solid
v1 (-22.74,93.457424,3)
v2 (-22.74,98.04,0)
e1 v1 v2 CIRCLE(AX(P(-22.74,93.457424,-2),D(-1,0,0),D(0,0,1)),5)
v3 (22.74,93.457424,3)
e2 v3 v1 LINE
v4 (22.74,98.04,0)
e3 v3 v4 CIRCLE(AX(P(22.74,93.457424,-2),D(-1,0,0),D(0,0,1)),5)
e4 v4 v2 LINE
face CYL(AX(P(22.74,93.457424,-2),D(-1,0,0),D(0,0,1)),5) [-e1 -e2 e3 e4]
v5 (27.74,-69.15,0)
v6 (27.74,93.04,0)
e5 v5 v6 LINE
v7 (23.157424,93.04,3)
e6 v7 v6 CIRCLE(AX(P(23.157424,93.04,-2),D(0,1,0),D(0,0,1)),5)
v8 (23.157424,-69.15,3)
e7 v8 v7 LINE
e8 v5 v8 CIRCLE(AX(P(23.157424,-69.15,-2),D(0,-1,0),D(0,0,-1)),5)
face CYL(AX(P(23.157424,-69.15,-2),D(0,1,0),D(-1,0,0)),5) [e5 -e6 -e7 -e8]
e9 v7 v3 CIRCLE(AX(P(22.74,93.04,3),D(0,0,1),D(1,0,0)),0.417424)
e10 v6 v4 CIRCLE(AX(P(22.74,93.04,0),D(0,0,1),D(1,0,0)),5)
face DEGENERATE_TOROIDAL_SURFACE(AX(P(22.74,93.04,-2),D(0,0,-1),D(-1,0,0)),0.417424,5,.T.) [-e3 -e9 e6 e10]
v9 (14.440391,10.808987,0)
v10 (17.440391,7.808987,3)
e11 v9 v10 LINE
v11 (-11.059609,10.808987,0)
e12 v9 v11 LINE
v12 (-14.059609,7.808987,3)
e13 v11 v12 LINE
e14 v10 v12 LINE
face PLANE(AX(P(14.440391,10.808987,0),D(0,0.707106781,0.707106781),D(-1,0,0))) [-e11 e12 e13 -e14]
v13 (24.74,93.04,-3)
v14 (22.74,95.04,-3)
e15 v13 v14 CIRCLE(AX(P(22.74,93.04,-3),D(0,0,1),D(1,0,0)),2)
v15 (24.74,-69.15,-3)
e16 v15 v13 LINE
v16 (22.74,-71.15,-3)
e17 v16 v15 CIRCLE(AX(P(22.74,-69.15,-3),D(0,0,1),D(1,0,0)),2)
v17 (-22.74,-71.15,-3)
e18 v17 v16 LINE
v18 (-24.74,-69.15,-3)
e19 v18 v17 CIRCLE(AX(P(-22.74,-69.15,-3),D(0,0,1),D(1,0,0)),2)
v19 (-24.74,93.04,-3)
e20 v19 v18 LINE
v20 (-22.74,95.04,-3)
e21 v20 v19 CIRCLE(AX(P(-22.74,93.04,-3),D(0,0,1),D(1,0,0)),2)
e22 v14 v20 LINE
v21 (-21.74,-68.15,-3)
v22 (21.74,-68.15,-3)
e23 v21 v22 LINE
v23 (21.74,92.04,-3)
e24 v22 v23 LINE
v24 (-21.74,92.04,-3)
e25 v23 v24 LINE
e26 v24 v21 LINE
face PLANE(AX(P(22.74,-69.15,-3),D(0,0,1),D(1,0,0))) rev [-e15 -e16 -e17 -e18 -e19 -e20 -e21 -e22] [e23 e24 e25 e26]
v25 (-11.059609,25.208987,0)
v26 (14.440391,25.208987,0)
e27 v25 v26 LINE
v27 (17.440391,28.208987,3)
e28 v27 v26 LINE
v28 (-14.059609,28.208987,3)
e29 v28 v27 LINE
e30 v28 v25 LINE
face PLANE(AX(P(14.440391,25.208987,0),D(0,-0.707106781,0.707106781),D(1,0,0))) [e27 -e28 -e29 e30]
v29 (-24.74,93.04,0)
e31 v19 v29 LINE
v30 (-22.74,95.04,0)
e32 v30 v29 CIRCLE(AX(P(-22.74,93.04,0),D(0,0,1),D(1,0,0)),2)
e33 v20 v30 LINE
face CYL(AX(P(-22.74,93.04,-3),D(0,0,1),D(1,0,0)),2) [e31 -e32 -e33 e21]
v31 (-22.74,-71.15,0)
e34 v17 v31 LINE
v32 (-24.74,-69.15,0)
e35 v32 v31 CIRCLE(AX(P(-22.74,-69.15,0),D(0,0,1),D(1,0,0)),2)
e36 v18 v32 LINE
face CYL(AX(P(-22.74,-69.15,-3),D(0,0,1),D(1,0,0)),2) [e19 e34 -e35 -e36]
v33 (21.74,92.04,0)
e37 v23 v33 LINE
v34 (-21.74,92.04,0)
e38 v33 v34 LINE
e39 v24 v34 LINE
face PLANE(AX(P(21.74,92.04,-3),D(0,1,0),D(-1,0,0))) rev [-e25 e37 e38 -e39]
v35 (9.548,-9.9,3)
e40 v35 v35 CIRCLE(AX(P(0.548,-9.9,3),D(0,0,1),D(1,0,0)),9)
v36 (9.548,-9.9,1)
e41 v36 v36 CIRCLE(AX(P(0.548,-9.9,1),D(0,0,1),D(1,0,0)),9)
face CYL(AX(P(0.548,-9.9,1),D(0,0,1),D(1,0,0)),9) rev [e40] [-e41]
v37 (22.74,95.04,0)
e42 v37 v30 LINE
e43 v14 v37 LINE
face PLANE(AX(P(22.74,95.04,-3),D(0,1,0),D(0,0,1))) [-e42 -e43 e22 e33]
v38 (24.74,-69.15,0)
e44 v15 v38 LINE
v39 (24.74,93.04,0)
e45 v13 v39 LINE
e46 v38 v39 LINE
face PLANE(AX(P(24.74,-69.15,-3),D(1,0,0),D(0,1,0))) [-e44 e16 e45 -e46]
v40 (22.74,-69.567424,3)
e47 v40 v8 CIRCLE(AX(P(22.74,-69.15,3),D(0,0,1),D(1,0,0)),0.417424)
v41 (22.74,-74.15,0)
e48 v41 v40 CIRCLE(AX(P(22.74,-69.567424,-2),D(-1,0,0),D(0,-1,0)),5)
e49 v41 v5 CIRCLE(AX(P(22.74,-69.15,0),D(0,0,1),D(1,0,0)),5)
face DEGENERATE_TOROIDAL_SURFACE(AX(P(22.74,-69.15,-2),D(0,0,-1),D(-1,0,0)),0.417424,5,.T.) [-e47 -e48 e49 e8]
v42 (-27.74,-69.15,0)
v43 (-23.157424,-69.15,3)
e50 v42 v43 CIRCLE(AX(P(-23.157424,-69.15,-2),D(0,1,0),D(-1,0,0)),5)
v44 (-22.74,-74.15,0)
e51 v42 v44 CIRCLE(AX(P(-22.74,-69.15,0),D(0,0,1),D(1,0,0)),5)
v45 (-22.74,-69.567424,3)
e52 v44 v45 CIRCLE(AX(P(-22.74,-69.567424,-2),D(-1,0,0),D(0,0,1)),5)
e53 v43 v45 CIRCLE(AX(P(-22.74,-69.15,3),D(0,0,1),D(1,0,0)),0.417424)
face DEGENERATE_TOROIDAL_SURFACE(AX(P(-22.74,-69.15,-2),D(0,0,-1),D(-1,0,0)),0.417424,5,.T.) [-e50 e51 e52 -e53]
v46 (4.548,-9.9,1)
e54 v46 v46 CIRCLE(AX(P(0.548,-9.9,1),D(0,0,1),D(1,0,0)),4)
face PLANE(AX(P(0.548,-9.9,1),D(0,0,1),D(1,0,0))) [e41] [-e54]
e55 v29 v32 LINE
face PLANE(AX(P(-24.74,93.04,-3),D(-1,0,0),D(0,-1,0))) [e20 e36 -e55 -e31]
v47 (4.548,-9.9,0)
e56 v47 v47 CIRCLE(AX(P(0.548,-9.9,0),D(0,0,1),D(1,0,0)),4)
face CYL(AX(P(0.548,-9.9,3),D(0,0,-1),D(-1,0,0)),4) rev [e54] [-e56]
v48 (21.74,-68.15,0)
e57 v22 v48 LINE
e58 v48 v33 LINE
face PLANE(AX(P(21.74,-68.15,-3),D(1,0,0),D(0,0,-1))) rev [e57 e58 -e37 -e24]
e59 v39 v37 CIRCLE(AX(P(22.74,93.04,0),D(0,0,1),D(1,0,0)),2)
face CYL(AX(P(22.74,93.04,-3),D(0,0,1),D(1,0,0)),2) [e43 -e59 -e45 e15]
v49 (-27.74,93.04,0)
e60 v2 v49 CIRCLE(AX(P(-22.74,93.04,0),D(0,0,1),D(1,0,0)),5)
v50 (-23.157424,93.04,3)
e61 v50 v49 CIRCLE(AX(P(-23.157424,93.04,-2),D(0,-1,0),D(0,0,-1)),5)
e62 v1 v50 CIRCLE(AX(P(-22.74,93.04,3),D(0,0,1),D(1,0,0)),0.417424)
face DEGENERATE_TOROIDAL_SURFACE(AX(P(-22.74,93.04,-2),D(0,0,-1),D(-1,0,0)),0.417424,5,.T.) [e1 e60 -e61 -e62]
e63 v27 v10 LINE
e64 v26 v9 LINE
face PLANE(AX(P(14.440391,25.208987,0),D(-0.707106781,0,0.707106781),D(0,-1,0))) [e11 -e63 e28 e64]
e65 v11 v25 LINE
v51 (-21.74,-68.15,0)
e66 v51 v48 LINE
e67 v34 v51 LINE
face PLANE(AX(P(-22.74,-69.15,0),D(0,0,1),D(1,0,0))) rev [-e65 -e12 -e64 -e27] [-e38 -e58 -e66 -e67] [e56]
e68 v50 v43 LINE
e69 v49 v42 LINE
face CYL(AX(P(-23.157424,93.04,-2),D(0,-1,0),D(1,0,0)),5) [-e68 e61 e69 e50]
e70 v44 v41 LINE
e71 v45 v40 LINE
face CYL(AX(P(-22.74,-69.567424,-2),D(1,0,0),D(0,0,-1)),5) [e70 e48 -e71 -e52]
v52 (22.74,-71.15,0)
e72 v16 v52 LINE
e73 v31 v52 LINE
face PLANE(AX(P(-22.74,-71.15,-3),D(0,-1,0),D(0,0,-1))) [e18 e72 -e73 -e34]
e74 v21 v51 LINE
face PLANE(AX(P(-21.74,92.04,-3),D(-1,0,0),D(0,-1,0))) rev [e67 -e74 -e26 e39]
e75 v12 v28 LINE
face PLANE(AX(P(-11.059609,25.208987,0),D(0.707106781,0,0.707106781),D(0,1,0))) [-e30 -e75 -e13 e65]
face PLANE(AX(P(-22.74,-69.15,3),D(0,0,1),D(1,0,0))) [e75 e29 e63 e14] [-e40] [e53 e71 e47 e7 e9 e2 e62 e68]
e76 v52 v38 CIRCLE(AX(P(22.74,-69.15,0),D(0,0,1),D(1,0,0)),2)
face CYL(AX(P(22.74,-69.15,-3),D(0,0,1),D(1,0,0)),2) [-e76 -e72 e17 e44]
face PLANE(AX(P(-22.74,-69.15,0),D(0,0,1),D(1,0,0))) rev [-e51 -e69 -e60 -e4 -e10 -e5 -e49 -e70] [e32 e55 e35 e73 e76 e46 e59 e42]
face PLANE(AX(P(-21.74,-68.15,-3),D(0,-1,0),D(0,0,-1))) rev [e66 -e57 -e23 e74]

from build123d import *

# Parameters (mm, degrees)
ESQUISSE1_W             = 43.48
ESQUISSE1_H             = 160.19
BOSS_EXTRU_1_DEPTH      = 3
ESQUISSE2_R             = 4
BOSS_EXTRU_2_DEPTH      = 3
ENL_V_MAT_EXTRU_1_REACH = 104.065
ESQUISSE3_W             = 25.5
ESQUISSE3_H             = 14.4
CHANFREIN1_SIZE         = 3
CONG_1_R                = 5
ESQUISSE4_R             = 9
ENL_V_MAT_EXTRU_2_DEPTH = 2


# Some blends are built 0.0001 mm under size
with BuildPart() as part:
    # Esquisse1 → Boss.-Extru.1 (new body)
    with BuildSketch(Plane.XY):
        with BuildLine():
            Line((24.74, -69.15), (24.74, 93.04))
            ThreePointArc((24.74, 93.04), (24.154213562, 94.454213562), (22.74, 95.04))
            Line((22.74, 95.04), (-22.74, 95.04))
            ThreePointArc((-22.74, 95.04), (-24.154213562, 94.454213562), (-24.74, 93.04))
            Line((-24.74, 93.04), (-24.74, -69.15))
            ThreePointArc((-24.74, -69.15), (-24.154213562, -70.564213562), (-22.74, -71.15))
            Line((-22.74, -71.15), (22.74, -71.15))
            ThreePointArc((22.74, -71.15), (24.154213562, -70.564213562), (24.74, -69.15))
        make_face()
        with Locations((0, 11.945)):
            Rectangle(ESQUISSE1_W, ESQUISSE1_H, mode=Mode.SUBTRACT)
    extrude(amount=-BOSS_EXTRU_1_DEPTH)

    # Esquisse2 → Boss.-Extru.2 (add)
    with BuildSketch(Plane.XY):
        with BuildLine():
            Line((-22.74, -74.15), (22.74, -74.15))
            ThreePointArc((22.74, -74.15), (26.275533906, -72.685533906), (27.74, -69.15))
            Line((27.74, -69.15), (27.74, 93.04))
            ThreePointArc((27.74, 93.04), (26.275533906, 96.575533906), (22.74, 98.04))
            Line((22.74, 98.04), (-22.74, 98.04))
            ThreePointArc((-22.74, 98.04), (-26.275533906, 96.575533906), (-27.74, 93.04))
            Line((-27.74, 93.04), (-27.74, -69.15))
            ThreePointArc((-27.74, -69.15), (-26.275533906, -72.685533906), (-22.74, -74.15))
        make_face()
        with Locations((0.548, -9.9)):
            Circle(ESQUISSE2_R, mode=Mode.SUBTRACT)
    extrude(amount=BOSS_EXTRU_2_DEPTH)

    # Esquisse3 → Enlèv. mat.-Extru.1 (cut, up to next)
    with BuildSketch(Plane.XY.offset(3), mode=Mode.PRIVATE) as enl_v_mat_extru_1_sk1:
        with Locations((1.690390628, 18.008987034)):
            Rectangle(ESQUISSE3_W, ESQUISSE3_H)
    enl_v_mat_extru_1_tool1 = extrude(enl_v_mat_extru_1_sk1.sketch, amount=-ENL_V_MAT_EXTRU_1_REACH, mode=Mode.PRIVATE) & part.part
    add(enl_v_mat_extru_1_tool1.solids().sort_by_distance((1.690391, 18.008987, 3))[0], mode=Mode.SUBTRACT)

    # Chanfrein1
    chanfrein1_edges = [part.edges().sort_by_distance(p)[0] for p in [
        (14.440390628, 18.008987034, 3),
        (1.690390628, 10.808987034, 3),
        (-11.059609372, 18.008987034, 3),
        (1.690390628, 25.208987034, 3),
    ]]
    chamfer(chanfrein1_edges, length=CHANFREIN1_SIZE - 0.0001)  # a hair under: the kernel refuses the full size

    # Congé1
    # the kernel refuses this fillet: 5 mm, written as the material it takes off along each edge
    with BuildSketch(Plane(origin=(-27.74, 93.04, 3), x_dir=(1, 0, 0), z_dir=(0, -1, 0)), Plane(origin=(27.74, -69.15, 3), x_dir=(-1, 0, 0), z_dir=(0, 1, 0))) as cong_1_piece_1:
        with BuildLine():
            CenterArc((4.582575695, -5), CONG_1_R, 90, 66.421821522)
            Line((0, -3), (-0.091651514, -2.96))
            ThreePointArc((-0.091651514, -2.96), (-0.1, -1.5), (-0.1, 0))
            Line((-0.1, 0), (0, 0.1))
            Line((0, 0.1), (4.582575695, 0.1))
            Line((4.582575695, 0.1), (4.582575695, 0))
        make_face()
    extrude(amount=162.19, mode=Mode.SUBTRACT)
    with BuildSketch(Plane(origin=(-22.74, 93.04, 3), x_dir=(0, 1, 0), z_dir=(1, 0, 0))) as cong_1_piece_2:
        with BuildLine():
            CenterArc((0.417424305, -5), CONG_1_R, 23.578178478, 66.421821522)
            Line((5, -3), (5.091651514, -2.96))
            ThreePointArc((5.091651514, -2.96), (5.1, -1.5), (5.1, 0))
            Line((5.1, 0), (5, 0.1))
            Line((5, 0.1), (0.417424305, 0.1))
            Line((0.417424305, 0.1), (0.417424305, 0))
        make_face()
    revolve(axis=Axis((-22.74, 93.04, 3), (0, 0, 1)), revolution_arc=90, mode=Mode.SUBTRACT)
    with BuildSketch(Plane(origin=(22.74, 98.04, 3), x_dir=(0, -1, 0), z_dir=(-1, 0, 0)), Plane(origin=(-22.74, -74.15, 3), x_dir=(0, 1, 0), z_dir=(1, 0, 0))) as cong_1_piece_3:
        with BuildLine():
            CenterArc((4.582575695, -5), CONG_1_R, 90, 66.421821522)
            Line((0, -3), (-0.091651514, -2.96))
            ThreePointArc((-0.091651514, -2.96), (-0.1, -1.5), (-0.1, 0))
            Line((-0.1, 0), (0, 0.1))
            Line((0, 0.1), (4.582575695, 0.1))
            Line((4.582575695, 0.1), (4.582575695, 0))
        make_face()
    extrude(amount=45.48, mode=Mode.SUBTRACT)
    with BuildSketch(Plane(origin=(22.74, 93.04, 3), x_dir=(1, 0, 0), z_dir=(0, -1, 0))) as cong_1_piece_4:
        with BuildLine():
            CenterArc((0.417424305, -5), CONG_1_R, 23.578178478, 66.421821522)
            Line((5, -3), (5.091651514, -2.96))
            ThreePointArc((5.091651514, -2.96), (5.1, -1.5), (5.1, 0))
            Line((5.1, 0), (5, 0.1))
            Line((5, 0.1), (0.417424305, 0.1))
            Line((0.417424305, 0.1), (0.417424305, 0))
        make_face()
    revolve(axis=Axis((22.74, 93.04, 3), (0, 0, 1)), revolution_arc=90, mode=Mode.SUBTRACT)
    with BuildSketch(Plane(origin=(22.74, -69.15, 3), x_dir=(0, -1, 0), z_dir=(-1, 0, 0))) as cong_1_piece_5:
        with BuildLine():
            CenterArc((0.417424305, -5), CONG_1_R, 23.578178478, 66.421821522)
            Line((5, -3), (5.091651514, -2.96))
            ThreePointArc((5.091651514, -2.96), (5.1, -1.5), (5.1, 0))
            Line((5.1, 0), (5, 0.1))
            Line((5, 0.1), (0.417424305, 0.1))
            Line((0.417424305, 0.1), (0.417424305, 0))
        make_face()
    revolve(axis=Axis((22.74, -69.15, 3), (0, 0, 1)), revolution_arc=90, mode=Mode.SUBTRACT)
    with BuildSketch(Plane(origin=(-22.74, -69.15, 3), x_dir=(-1, 0, 0), z_dir=(0, 1, 0))) as cong_1_piece_6:
        with BuildLine():
            CenterArc((0.417424305, -5), CONG_1_R, 23.578178478, 66.421821522)
            Line((5, -3), (5.091651514, -2.96))
            ThreePointArc((5.091651514, -2.96), (5.1, -1.5), (5.1, 0))
            Line((5.1, 0), (5, 0.1))
            Line((5, 0.1), (0.417424305, 0.1))
            Line((0.417424305, 0.1), (0.417424305, 0))
        make_face()
    revolve(axis=Axis((-22.74, -69.15, 3), (0, 0, 1)), revolution_arc=90, mode=Mode.SUBTRACT)

    # Esquisse4 → Enlèv. mat.-Extru.2 (cut)
    with BuildSketch(Plane.XY.offset(3)):
        with Locations((0.548, -9.9)):
            Circle(ESQUISSE4_R)
    extrude(amount=-ENL_V_MAT_EXTRU_2_DEPTH, mode=Mode.SUBTRACT)


solid = part.part
